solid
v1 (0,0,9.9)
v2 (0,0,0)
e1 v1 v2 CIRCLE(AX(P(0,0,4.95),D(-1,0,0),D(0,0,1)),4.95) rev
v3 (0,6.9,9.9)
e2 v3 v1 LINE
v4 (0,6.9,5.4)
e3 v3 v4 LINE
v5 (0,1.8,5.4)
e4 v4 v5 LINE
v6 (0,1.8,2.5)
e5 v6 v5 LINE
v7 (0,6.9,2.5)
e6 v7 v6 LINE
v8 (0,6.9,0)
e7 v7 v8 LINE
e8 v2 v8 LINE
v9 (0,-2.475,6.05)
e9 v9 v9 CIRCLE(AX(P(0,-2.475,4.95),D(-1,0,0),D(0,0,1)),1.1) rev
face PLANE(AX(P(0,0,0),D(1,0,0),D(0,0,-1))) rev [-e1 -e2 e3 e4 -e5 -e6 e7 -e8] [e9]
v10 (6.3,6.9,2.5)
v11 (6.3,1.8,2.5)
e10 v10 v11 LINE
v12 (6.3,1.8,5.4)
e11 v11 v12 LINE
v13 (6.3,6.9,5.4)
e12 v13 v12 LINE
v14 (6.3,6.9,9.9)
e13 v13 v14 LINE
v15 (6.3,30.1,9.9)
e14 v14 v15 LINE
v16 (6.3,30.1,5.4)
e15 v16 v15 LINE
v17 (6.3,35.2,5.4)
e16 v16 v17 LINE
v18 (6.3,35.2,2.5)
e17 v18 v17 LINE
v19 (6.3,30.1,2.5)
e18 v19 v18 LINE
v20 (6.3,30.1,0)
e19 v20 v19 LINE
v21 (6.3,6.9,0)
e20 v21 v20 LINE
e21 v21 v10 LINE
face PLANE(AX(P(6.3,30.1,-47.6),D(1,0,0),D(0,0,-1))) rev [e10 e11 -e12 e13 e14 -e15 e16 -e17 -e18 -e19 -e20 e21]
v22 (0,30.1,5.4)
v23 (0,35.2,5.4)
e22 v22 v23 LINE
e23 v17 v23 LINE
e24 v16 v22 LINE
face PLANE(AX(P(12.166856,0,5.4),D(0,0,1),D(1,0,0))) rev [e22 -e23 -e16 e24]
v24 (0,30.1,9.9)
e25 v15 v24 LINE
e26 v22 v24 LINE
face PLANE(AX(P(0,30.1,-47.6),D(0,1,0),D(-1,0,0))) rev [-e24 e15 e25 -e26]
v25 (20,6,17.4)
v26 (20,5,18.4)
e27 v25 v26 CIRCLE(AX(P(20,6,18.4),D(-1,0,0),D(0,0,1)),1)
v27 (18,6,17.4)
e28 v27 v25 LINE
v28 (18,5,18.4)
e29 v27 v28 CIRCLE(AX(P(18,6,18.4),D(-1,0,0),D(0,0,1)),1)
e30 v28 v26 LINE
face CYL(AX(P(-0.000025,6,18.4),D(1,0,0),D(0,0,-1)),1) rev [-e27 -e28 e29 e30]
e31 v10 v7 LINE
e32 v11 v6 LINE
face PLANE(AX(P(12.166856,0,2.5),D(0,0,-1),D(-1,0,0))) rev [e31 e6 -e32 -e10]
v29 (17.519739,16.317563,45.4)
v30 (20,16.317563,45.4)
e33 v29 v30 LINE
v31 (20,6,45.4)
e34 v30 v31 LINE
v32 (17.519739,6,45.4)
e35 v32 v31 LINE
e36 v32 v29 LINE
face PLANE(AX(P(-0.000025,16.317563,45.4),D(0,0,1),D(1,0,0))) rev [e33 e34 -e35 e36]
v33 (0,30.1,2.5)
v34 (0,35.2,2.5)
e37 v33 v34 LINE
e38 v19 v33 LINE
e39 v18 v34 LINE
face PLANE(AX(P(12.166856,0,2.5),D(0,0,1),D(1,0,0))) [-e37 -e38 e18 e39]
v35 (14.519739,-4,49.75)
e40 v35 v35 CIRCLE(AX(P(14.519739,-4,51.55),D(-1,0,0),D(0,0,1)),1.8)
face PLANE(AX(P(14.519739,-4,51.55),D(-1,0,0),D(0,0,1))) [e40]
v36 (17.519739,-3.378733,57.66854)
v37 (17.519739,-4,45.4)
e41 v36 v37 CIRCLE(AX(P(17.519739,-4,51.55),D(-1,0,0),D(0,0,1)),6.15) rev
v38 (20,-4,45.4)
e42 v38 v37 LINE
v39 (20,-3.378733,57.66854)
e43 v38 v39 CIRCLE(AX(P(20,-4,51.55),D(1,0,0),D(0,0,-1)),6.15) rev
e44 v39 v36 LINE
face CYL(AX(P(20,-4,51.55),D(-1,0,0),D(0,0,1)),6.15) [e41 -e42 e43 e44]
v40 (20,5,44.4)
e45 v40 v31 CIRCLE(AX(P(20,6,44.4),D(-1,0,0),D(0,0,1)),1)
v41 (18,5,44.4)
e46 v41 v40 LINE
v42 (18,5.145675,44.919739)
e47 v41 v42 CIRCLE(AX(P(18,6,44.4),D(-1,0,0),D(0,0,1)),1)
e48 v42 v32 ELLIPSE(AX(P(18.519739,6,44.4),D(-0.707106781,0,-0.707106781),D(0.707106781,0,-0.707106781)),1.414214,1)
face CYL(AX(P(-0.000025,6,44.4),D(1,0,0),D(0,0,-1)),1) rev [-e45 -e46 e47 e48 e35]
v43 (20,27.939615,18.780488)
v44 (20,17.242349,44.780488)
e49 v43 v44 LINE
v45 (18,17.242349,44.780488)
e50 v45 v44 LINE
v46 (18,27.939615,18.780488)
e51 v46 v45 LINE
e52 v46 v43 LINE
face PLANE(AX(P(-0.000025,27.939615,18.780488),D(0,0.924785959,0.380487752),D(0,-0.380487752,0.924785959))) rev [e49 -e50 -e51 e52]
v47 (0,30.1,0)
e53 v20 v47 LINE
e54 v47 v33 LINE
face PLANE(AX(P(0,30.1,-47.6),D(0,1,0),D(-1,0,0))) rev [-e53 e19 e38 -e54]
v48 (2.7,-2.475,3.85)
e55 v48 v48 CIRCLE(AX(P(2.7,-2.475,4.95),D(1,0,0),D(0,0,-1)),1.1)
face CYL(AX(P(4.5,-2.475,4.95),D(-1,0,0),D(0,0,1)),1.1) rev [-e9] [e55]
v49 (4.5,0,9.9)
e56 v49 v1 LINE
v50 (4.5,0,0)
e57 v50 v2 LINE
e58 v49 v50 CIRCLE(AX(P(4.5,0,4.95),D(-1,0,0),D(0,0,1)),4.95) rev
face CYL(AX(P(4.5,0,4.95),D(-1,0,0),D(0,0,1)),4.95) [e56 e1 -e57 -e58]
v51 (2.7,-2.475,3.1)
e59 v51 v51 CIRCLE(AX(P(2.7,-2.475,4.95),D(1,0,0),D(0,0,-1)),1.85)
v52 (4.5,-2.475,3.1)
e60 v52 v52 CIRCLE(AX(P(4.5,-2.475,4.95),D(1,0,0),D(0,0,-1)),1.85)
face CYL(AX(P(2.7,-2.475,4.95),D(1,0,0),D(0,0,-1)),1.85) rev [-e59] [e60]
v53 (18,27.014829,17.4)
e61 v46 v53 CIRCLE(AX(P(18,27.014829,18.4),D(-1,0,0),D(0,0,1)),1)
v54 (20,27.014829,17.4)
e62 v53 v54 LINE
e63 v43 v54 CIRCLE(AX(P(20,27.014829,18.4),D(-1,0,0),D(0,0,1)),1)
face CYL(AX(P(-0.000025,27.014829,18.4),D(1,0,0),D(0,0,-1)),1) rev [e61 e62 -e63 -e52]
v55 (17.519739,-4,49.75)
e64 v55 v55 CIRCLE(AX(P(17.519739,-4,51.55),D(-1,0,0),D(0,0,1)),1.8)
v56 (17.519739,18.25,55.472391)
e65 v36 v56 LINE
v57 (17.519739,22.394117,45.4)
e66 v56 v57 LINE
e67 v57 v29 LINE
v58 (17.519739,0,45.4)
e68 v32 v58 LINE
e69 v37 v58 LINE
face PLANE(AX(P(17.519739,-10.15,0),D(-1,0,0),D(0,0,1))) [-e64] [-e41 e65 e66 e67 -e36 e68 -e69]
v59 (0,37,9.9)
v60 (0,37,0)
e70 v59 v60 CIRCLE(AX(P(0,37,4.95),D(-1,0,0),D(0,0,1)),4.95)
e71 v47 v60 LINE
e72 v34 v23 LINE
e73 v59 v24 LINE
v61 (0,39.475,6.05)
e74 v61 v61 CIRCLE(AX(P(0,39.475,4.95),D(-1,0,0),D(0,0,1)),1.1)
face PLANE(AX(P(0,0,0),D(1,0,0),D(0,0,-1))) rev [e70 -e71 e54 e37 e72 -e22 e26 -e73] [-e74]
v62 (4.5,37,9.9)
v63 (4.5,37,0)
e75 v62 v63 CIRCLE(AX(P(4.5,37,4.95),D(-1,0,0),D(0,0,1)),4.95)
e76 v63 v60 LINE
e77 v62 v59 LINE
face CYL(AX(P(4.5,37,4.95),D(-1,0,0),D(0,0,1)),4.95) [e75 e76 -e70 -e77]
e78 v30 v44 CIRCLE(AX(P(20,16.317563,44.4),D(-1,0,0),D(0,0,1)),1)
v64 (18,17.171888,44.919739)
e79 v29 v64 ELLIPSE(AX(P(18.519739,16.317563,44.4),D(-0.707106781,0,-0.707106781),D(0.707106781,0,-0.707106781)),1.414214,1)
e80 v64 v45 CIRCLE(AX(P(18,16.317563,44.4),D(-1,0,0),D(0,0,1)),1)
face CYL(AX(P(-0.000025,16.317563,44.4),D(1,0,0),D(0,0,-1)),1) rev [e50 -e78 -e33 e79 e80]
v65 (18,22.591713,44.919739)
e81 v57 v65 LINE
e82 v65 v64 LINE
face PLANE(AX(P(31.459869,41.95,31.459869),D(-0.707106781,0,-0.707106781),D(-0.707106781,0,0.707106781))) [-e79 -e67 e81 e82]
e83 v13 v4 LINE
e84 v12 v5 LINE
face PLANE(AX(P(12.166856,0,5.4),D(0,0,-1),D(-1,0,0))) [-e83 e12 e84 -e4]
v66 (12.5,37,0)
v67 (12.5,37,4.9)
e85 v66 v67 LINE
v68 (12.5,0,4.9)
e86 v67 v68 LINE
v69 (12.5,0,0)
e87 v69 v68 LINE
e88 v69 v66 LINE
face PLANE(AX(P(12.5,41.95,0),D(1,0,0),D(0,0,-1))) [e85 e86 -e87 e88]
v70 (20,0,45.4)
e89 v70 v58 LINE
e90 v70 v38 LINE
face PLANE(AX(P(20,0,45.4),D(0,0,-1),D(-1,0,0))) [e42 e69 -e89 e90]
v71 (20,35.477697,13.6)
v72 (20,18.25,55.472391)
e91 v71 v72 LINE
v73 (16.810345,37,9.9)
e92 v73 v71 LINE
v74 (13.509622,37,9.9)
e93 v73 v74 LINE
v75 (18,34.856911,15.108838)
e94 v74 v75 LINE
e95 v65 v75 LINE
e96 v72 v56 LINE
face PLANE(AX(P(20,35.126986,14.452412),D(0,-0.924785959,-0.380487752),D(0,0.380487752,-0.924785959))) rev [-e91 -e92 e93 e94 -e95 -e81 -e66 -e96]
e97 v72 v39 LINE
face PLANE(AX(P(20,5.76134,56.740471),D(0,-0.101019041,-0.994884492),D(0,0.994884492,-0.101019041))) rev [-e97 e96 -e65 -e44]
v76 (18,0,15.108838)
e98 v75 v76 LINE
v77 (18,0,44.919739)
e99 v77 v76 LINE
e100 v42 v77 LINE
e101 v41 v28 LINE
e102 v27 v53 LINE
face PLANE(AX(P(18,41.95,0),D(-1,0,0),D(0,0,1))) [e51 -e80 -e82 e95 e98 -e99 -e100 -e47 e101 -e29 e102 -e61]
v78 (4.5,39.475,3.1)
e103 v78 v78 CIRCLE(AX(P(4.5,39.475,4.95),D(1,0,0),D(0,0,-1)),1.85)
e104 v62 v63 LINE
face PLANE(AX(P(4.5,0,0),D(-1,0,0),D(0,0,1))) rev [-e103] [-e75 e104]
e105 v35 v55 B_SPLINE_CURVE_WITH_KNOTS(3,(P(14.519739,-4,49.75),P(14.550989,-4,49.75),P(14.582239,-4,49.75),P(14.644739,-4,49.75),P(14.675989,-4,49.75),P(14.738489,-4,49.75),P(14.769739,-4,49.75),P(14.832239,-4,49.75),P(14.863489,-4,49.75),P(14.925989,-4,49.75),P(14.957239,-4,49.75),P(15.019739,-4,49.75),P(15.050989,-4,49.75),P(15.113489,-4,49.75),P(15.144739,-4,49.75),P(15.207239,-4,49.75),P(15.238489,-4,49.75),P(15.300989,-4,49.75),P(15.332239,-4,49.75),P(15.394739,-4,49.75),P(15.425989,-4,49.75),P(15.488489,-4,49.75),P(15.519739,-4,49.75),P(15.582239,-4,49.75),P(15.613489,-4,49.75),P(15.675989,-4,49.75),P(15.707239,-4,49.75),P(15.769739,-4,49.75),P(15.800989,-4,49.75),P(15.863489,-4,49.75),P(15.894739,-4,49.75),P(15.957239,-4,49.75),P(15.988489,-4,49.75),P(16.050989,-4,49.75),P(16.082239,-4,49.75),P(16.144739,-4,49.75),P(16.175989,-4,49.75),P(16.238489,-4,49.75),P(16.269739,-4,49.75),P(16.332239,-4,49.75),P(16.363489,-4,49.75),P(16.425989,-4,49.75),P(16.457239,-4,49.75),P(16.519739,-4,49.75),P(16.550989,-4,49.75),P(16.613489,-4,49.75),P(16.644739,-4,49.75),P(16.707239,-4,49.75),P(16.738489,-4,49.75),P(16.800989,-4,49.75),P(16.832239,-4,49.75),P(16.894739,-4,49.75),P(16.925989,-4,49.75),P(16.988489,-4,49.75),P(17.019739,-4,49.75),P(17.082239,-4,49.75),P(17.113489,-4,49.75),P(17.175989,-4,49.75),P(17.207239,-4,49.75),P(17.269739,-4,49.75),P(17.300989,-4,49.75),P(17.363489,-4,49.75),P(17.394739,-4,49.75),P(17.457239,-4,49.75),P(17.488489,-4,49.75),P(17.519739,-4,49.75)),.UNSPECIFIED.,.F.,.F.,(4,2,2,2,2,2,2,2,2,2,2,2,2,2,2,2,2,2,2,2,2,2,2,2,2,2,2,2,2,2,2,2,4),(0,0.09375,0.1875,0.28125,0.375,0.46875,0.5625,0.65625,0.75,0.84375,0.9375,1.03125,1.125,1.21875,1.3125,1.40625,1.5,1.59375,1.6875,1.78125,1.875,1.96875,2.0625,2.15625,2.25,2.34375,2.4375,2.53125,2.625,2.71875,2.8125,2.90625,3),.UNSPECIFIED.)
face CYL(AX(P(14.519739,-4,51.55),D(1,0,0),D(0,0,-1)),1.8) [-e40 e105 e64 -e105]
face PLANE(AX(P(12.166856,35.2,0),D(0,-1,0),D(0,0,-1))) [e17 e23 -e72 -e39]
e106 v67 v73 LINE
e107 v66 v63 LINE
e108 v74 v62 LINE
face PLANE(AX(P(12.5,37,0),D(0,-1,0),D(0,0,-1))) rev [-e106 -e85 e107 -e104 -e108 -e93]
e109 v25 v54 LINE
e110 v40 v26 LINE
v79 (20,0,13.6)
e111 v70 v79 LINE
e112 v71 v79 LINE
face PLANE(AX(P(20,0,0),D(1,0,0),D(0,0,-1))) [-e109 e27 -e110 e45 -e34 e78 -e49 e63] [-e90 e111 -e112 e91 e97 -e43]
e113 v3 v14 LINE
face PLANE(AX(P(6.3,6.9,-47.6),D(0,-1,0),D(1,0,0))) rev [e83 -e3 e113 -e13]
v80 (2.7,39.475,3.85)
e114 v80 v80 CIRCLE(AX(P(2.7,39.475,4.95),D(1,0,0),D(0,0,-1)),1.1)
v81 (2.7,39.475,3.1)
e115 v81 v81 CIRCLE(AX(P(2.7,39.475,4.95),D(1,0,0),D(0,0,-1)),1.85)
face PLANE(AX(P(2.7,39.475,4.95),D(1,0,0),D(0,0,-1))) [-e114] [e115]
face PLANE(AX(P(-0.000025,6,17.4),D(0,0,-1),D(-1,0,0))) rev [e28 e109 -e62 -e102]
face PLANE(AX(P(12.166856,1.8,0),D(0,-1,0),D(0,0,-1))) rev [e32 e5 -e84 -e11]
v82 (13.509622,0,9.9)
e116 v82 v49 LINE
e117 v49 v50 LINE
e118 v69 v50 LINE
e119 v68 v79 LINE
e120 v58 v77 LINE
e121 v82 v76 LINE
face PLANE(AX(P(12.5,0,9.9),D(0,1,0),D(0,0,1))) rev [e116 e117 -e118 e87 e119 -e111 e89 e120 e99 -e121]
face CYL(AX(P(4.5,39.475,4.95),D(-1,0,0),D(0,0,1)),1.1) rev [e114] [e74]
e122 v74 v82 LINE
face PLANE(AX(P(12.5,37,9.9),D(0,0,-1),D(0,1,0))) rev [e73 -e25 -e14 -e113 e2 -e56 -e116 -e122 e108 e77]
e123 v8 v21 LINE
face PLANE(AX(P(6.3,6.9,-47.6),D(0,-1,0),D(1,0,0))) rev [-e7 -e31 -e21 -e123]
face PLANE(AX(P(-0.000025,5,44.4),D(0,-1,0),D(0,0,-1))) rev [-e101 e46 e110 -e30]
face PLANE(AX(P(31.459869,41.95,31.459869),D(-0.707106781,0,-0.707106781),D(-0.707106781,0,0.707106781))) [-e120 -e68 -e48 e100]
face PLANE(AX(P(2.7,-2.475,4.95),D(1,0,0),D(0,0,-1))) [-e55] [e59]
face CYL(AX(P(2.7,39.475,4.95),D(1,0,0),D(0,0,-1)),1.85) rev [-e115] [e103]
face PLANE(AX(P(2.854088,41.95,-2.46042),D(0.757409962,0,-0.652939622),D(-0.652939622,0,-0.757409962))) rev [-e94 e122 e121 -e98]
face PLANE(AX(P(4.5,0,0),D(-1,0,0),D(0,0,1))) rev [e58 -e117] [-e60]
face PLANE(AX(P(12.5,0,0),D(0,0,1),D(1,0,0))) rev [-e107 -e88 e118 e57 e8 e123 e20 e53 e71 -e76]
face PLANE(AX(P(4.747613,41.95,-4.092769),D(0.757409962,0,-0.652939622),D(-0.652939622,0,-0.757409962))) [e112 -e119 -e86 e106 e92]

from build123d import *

# Parameters (mm, degrees)
SZKIC1_W                       = 9.9
SZKIC1_H                       = 37
DODANIE_WYCI_GNI_CIE1_DEPTH    = 12.5
DODANIE_WYCI_GNI_CIE2_DEPTH    = 7.5
WYTNIJ_WYCI_GNI_CIE1_START     = -47.15
WYTNIJ_WYCI_GNI_CIE1_OUTLINE_W = 17.51973865
WYTNIJ_WYCI_GNI_CIE1_OUTLINE_H = 49.213267073
WYTNIJ_WYCI_GNI_CIE1_DEPTH     = 47.15
SZKIC4_W                       = 6.3
SZKIC4_H                       = 23.2
WYTNIJ_WYCI_GNI_CIE2_DEPTH     = 57.5
BOSS_EXTRU_1_START             = -2.480261
ESQUISSE2_R                    = 1.8
BOSS_EXTRU_1_DEPTH             = 3
ENL_V_MAT_EXTRU_1_DEPTH        = 72.402310887
ESQUISSE4_W                    = 2.9
ESQUISSE4_H                    = 5.1
ENL_V_MAT_EXTRU_2_DEPTH        = 6.3
BOSS_EXTRU_2_DEPTH             = 37
ESQUISSE6_R                    = 1.1
BOSS_EXTRU_3_DEPTH             = 4.5
ENL_V_START                    = -1.8
ESQUISSE8_R                    = 1.85
ESQUISSE8_R_2                  = 1.1
ENL_V_MAT_EXTRU_5_DEPTH        = 1.8
BOSS_EXTRU_4_REACH             = 76.088
ENL_V_MAT_EXTRU_7_DEPTH        = 75.088410025
ENL_V_MAT_EXTRU_8_DEPTH        = 66.729440163


# Read off the part's stored shape, not the designer's step: Wytnij-wyciągnięcie1
with BuildPart() as part:
    # Szkic1 → Dodanie-wyciągnięcie1 (new body)
    with BuildSketch(Plane(origin=(0, 0, 0), x_dir=(0, 0, -1), z_dir=(1, 0, 0))):
        with Locations((-4.95, 18.5)):
            Rectangle(SZKIC1_W, SZKIC1_H)
    extrude(amount=DODANIE_WYCI_GNI_CIE1_DEPTH)

    # Szkic2 → Dodanie-wyciągnięcie2 (add)
    with BuildSketch(Plane(origin=(12.5, 0, 0), x_dir=(0, 0, -1), z_dir=(1, 0, 0))):
        with BuildLine():
            Line((-45.4, 0), (-7.4, 0))
            Line((-7.4, 0), (-7.4, 37))
            Line((-7.4, 37), (-9.9, 37))
            Line((-9.9, 37), (-55.472391365, 18.25))
            Line((-55.472391365, 18.25), (-57.668539629, -3.378732899))
            ThreePointArc((-57.668539629, -3.378732899), (-51.861031576, -10.142129872), (-45.4, -4))
            Line((-45.4, -4), (-45.4, 0))
        make_face()
    extrude(amount=DODANIE_WYCI_GNI_CIE2_DEPTH)

    # Wytnij-wyciągnięcie1 outline → Wytnij-wyciągnięcie1 (cut)
    with BuildSketch(Plane(origin=(0, 37, 0), x_dir=(1, 0, 0), z_dir=(0, 1, 0)).offset(WYTNIJ_WYCI_GNI_CIE1_START)):
        with Locations((8.759869325, -38.061906093)):
            Rectangle(WYTNIJ_WYCI_GNI_CIE1_OUTLINE_W, WYTNIJ_WYCI_GNI_CIE1_OUTLINE_H)
        Polygon((15, -7.4), (20, -12.4), (20, -7.4), align=None)
    extrude(amount=WYTNIJ_WYCI_GNI_CIE1_DEPTH, mode=Mode.SUBTRACT)

    # Szkic4 → Wytnij-wyciągnięcie2 (cut)
    with BuildSketch(Plane.XY.offset(9.9)):
        with Locations((3.15, 18.5)):
            Rectangle(SZKIC4_W, SZKIC4_H)
    extrude(amount=-WYTNIJ_WYCI_GNI_CIE2_DEPTH, mode=Mode.SUBTRACT)

    # Esquisse2 → Boss.-Extru.1 (add)
    with BuildSketch(Plane(origin=(20, 0, 0), x_dir=(0, 0, -1), z_dir=(1, 0, 0)).offset(BOSS_EXTRU_1_START)):
        with Locations((-51.55, -4)):
            Circle(ESQUISSE2_R)
    extrude(amount=-BOSS_EXTRU_1_DEPTH)

    # Esquisse3 → Enlèv. mat.-Extru.1 (cut, through all)
    with BuildSketch(Plane(origin=(20, 0, 0), x_dir=(0, 0, -1), z_dir=(1, 0, 0))):
        with BuildLine():
            Line((-17.4, 6), (-17.4, 27.014829056))
            ThreePointArc((-17.4, 27.014829056), (-17.843442614, 27.845638225), (-18.780487752, 27.939615015))
            Line((-18.780487752, 27.939615015), (-44.780487752, 17.242348855))
            ThreePointArc((-44.780487752, 17.242348855), (-45.230809169, 16.874120282), (-45.4, 16.317562896))
            Line((-45.4, 16.317562896), (-45.4, 6))
            ThreePointArc((-45.4, 6), (-45.107106781, 5.292893219), (-44.4, 5))
            Line((-44.4, 5), (-18.4, 5))
            ThreePointArc((-18.4, 5), (-17.692893219, 5.292893219), (-17.4, 6))
        make_face()
    extrude(amount=-ENL_V_MAT_EXTRU_1_DEPTH, mode=Mode.SUBTRACT)

    # Esquisse4 → Enlèv. mat.-Extru.2 (cut)
    with BuildSketch(Plane.ZY):
        with Locations((3.95, 32.65)):
            Rectangle(ESQUISSE4_W, ESQUISSE4_H)
        with Locations((3.95, 4.35)):
            Rectangle(ESQUISSE4_W, ESQUISSE4_H)
    extrude(amount=-ENL_V_MAT_EXTRU_2_DEPTH, mode=Mode.SUBTRACT)

    # Esquisse5 → Boss.-Extru.2 (add)
    with BuildSketch(Plane.XZ):
        Polygon((12.5, 4.9), (15, 7.4), (12.5, 7.4), align=None)
    extrude(amount=-BOSS_EXTRU_2_DEPTH)

    # Esquisse6 → Boss.-Extru.3 (add)
    # profile 1 of 3: a face of its own
    with BuildSketch(Plane.ZY):
        Polygon((2.5, 30.1), (2.5, 35.2), (5.4, 35.2), (5.4, 30.1), (9.9, 30.1), (9.9, 37), (0, 37), (0, 30.1), align=None)
    # profile 2 of 3: a face of its own
    with BuildSketch(Plane.ZY):
        with BuildLine():
            ThreePointArc((9.9, 37), (4.95, 41.95), (0, 37))
            Line((0, 37), (9.9, 37))
        make_face()
        with Locations((4.95, 39.475)):
            Circle(ESQUISSE6_R, mode=Mode.SUBTRACT)
    # profile 3 of 3: a face of its own
    with BuildSketch(Plane.ZY):
        with BuildLine():
            ThreePointArc((0, 0), (4.95, -4.95), (9.9, 0))
            Line((9.9, 0), (0, 0))
        make_face()
        with Locations((4.95, -2.475)):
            Circle(ESQUISSE6_R, mode=Mode.SUBTRACT)
    extrude(amount=-BOSS_EXTRU_3_DEPTH)

    # Esquisse8 → Enlèv. mat.-Extru.5 (cut)
    # profile 1 of 2: a face of its own
    with BuildSketch(Plane(origin=(4.5, 0, 0), x_dir=(0, 0, -1), z_dir=(1, 0, 0)).offset(ENL_V_START)):
        with Locations((-4.95, 39.475)):
            Circle(ESQUISSE8_R)
        with Locations(Location((-4.95, 39.475, 0), (0, 0, 180))):
            Circle(ESQUISSE8_R_2, mode=Mode.SUBTRACT)
    # profile 2 of 2: a face of its own
    with BuildSketch(Plane(origin=(4.5, 0, 0), x_dir=(0, 0, -1), z_dir=(1, 0, 0)).offset(ENL_V_START)):
        with Locations((-4.95, -2.475)):
            Circle(ESQUISSE8_R)
        with Locations(Location((-4.95, -2.475, 0), (0, 0, 180))):
            Circle(ESQUISSE8_R_2, mode=Mode.SUBTRACT)
    extrude(amount=ENL_V_MAT_EXTRU_5_DEPTH, mode=Mode.SUBTRACT)

    # Boss.-Extru.4: up to this face of the body (flat: up to its plane)
    boss_extru_4_end = Plane(part.part.faces().sort_by_distance((9.272446383, 37, 5.397564522))[0])
    # Esquisse10 → Boss.-Extru.4 (add, up to the picked face)
    with BuildSketch(Plane.XZ, mode=Mode.PRIVATE) as boss_extru_4_sk1:
        Polygon((20, 0), (12.5, 0), (12.5, 4.9), (20, 12.4), align=None)
    boss_extru_4_tool1 = split(extrude(boss_extru_4_sk1.sketch, amount=-BOSS_EXTRU_4_REACH, mode=Mode.PRIVATE), bisect_by=boss_extru_4_end, keep=Keep.BOTH, mode=Mode.PRIVATE)
    # Esquisse10 → Boss.-Extru.4 (add, up to the picked face)
    with BuildSketch(Plane.XZ, mode=Mode.PRIVATE) as boss_extru_4_sk2:
        Polygon((17.51973865, 13.455272556), (17.51973865, 18.475011205), (12.5, 13.455272556), align=None)
    boss_extru_4_tool2 = split(extrude(boss_extru_4_sk2.sketch, amount=-BOSS_EXTRU_4_REACH, mode=Mode.PRIVATE), bisect_by=boss_extru_4_end, keep=Keep.BOTH, mode=Mode.PRIVATE)
    add(boss_extru_4_tool1.solids().sort_by(Axis((16.791908, 0, 4.595954), (0, 1, 0)))[0])
    add(boss_extru_4_tool2.solids().sort_by(Axis((15.846492, 0, 15.128519), (0, 1, 0)))[0])

    # Esquisse11 → Enlèv. mat.-Extru.7 (cut, through all)
    with BuildSketch(Plane.XZ):
        Polygon((17.51973865, 18.475011205), (18, 18.955272556), (18, 44.91973865), (17.51973865, 45.4), align=None)
        Polygon((12.5, 13.455272556), (12.5, 9.9), (13.509622462, 9.9), (17.51973865, 14.551734777), (17.51973865, 18.475011205), align=None)
        Polygon((17.51973865, 14.551734777), (18, 15.108837944), (18, 18.955272556), (17.51973865, 18.475011205), align=None)
        Polygon((12.5, 4.9), (12.5, 0), (20, 0), (20, 13.6), align=None)
    extrude(amount=-ENL_V_MAT_EXTRU_7_DEPTH, mode=Mode.SUBTRACT)

    # Esquisse12 → Enlèv. mat.-Extru.8 (cut, through all)
    with BuildSketch(Plane(origin=(0, 35.126985948, 14.452412235), x_dir=(1, 0, 0), z_dir=(0, 0.9247859593811136, 0.3804877518811259))):
        Polygon((20, -44.356187196), (20, 0.921740026), (16.810344828, 4.922665822), (13.509622462, 4.922665822), (16.574512596, 1.078238341), (17.51973865, 1.078238341), (17.51973865, -0.107400574), (18, -0.709813663), (18, -32.945273559), (17.51973865, -33.464595187), (17.51973865, -44.356187196), align=None)
        Polygon((16.574512596, 1.078238341), (17.51973865, -0.107400574), (17.51973865, 1.078238341), align=None)
    extrude(amount=ENL_V_MAT_EXTRU_8_DEPTH, mode=Mode.SUBTRACT)


solid = part.part
